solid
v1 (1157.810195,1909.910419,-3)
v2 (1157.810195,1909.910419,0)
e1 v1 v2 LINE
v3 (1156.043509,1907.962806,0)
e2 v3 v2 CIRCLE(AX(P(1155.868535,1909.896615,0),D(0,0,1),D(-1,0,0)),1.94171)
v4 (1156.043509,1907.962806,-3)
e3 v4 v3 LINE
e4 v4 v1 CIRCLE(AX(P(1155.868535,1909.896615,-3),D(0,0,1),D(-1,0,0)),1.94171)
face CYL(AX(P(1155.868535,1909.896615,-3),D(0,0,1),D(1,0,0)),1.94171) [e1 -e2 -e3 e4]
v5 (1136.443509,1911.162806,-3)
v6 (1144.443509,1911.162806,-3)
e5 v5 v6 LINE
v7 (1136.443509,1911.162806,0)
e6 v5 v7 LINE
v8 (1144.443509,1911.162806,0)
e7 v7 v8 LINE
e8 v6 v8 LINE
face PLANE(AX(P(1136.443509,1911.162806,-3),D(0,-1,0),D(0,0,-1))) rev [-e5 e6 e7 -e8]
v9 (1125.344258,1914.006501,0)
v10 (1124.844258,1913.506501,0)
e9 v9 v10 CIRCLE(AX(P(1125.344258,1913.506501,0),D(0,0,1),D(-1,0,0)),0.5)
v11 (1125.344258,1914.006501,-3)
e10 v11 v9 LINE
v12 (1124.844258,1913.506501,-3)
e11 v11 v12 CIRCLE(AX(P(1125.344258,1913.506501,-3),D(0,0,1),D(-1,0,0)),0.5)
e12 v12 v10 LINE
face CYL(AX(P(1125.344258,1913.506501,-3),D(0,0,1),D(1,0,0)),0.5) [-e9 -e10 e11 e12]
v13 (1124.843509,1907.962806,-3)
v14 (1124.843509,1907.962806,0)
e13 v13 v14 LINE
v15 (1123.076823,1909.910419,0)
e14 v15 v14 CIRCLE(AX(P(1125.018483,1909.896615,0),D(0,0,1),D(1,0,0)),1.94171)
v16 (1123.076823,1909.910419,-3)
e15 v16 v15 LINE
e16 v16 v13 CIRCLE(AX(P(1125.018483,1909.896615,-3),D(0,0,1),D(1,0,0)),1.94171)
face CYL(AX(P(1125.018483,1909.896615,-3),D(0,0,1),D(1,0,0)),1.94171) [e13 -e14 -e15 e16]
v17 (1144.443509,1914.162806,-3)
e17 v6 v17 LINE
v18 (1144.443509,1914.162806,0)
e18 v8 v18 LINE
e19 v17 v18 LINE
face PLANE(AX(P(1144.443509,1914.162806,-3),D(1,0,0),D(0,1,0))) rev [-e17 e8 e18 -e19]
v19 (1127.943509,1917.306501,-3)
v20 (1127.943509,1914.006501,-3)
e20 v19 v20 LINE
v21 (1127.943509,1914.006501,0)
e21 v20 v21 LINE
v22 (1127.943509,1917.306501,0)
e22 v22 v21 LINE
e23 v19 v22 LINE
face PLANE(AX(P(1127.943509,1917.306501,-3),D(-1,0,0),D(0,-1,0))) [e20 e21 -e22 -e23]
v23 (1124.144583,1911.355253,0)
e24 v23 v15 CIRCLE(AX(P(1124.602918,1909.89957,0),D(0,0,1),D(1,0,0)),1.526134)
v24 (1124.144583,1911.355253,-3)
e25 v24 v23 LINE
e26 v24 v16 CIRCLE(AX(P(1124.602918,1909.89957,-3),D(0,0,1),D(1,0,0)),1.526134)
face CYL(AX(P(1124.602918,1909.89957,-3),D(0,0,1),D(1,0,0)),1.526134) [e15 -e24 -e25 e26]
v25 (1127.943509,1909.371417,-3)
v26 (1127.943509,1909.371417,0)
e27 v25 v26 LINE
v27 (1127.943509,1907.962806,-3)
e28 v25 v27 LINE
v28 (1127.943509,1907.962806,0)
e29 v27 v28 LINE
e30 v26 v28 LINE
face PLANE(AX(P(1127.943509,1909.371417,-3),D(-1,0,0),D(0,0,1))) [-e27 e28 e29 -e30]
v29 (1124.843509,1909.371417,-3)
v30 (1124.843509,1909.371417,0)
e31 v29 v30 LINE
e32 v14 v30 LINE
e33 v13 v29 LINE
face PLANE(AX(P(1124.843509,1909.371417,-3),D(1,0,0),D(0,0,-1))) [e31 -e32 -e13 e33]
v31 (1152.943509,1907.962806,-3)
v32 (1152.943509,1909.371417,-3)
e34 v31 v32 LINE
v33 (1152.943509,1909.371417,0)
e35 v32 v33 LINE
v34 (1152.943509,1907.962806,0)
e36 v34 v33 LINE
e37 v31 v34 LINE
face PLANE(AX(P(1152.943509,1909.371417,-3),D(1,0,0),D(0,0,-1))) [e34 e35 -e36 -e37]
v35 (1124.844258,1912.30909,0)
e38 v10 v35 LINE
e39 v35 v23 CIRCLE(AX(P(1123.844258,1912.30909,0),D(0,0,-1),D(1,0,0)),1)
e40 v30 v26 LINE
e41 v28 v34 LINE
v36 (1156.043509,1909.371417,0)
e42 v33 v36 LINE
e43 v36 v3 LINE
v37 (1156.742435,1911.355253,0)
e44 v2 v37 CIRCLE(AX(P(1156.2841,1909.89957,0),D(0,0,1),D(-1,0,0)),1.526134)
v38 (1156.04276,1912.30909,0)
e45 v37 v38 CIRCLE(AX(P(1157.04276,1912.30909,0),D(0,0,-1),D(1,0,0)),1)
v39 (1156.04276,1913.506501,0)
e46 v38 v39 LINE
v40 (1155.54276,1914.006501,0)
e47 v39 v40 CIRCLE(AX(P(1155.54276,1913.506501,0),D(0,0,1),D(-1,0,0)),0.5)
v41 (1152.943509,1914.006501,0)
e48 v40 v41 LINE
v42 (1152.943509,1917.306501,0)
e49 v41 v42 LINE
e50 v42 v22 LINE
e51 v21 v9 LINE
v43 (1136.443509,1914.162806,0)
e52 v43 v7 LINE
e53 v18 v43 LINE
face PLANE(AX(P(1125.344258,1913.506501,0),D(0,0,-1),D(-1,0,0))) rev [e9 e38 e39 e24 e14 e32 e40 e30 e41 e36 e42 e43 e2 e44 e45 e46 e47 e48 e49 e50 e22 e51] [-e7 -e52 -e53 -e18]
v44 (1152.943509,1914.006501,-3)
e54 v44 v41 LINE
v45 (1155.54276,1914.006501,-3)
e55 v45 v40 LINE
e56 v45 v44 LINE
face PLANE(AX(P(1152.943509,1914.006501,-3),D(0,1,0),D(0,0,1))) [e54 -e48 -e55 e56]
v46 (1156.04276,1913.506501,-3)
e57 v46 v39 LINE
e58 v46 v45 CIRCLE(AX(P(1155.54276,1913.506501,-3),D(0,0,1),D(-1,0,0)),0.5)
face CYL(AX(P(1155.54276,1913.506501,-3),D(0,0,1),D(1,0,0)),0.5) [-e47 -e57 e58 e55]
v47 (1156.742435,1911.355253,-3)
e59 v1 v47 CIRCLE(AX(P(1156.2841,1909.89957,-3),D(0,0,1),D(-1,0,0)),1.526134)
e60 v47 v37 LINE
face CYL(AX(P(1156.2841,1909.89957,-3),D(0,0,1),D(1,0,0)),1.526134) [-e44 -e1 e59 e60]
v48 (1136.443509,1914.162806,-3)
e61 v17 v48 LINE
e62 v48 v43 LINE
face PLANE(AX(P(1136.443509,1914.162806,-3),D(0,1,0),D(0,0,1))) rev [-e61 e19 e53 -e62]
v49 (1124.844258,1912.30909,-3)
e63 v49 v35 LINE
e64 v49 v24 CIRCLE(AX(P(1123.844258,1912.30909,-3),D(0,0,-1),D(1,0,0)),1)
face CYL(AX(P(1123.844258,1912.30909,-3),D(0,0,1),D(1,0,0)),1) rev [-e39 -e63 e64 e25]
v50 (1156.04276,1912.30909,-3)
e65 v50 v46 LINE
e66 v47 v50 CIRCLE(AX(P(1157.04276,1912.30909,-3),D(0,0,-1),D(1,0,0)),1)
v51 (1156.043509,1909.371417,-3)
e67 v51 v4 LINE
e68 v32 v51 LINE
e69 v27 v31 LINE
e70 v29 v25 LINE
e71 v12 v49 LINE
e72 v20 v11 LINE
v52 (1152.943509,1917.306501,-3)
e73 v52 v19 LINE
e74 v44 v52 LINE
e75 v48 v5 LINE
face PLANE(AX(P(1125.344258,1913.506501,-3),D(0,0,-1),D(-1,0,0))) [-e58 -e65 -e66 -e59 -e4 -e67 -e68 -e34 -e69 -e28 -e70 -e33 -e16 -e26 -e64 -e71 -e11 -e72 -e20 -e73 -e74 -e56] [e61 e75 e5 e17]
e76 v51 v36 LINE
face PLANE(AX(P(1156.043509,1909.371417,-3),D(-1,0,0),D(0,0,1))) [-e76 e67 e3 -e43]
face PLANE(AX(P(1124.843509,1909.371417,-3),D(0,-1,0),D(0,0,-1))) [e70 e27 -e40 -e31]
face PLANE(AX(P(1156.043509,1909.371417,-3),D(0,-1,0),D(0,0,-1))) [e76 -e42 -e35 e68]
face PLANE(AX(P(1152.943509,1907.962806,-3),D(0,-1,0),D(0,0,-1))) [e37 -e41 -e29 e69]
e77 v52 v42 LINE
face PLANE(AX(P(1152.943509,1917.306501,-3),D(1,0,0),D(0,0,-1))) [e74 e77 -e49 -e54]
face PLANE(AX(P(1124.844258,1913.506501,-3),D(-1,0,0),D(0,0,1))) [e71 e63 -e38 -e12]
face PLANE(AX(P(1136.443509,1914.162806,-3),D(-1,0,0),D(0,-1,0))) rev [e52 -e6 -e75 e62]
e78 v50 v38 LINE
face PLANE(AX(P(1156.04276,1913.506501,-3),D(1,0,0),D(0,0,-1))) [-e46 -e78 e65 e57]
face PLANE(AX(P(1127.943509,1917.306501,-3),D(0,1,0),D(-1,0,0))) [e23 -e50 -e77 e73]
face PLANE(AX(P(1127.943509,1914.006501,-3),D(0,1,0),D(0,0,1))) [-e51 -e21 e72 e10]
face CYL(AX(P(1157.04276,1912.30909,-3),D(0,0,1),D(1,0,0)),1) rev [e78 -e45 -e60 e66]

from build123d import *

# Parameters (mm, degrees)
ESQUISSE1_W               = 8
ESQUISSE1_H               = 3
T_LE_DE_BASE_PLI_E1_DEPTH = 3


# Sheet-metal steps are written as plain solids
with BuildPart() as part:
    # Esquisse1 → Tôle de base pliée1 (new body)
    with BuildSketch(Plane.XY):
        with BuildLine():
            Line((1127.943508916, 1917.30650062), (1152.943508916, 1917.30650062))
            Line((1152.943508916, 1917.30650062), (1152.943508916, 1914.00650062))
            Line((1152.943508916, 1914.00650062), (1155.54275991, 1914.00650062))
            ThreePointArc((1155.54275991, 1914.00650062), (1155.896313301, 1913.860054011), (1156.04275991, 1913.50650062))
            Line((1156.04275991, 1913.50650062), (1156.04275991, 1912.309090129))
            ThreePointArc((1156.04275991, 1912.309090129), (1156.236433485, 1911.717619339), (1156.742435301, 1911.355253073))
            ThreePointArc((1156.742435301, 1911.355253073), (1157.511445693, 1910.806601852), (1157.810195296, 1909.910418936))
            ThreePointArc((1157.810195296, 1909.910418936), (1157.306705477, 1908.592046054), (1156.043508916, 1907.962805635))
            Line((1156.043508916, 1907.962805635), (1156.043508916, 1909.371416958))
            Line((1156.043508916, 1909.371416958), (1152.943508916, 1909.371416958))
            Line((1152.943508916, 1909.371416958), (1152.943508916, 1907.962805635))
            Line((1152.943508916, 1907.962805635), (1127.943508916, 1907.962805635))
            Line((1127.943508916, 1907.962805635), (1127.943508916, 1909.371416958))
            Line((1127.943508916, 1909.371416958), (1124.843508916, 1909.371416958))
            Line((1124.843508916, 1909.371416958), (1124.843508916, 1907.962805635))
            ThreePointArc((1124.843508916, 1907.962805635), (1123.580312356, 1908.592046054), (1123.076822537, 1909.910418936))
            ThreePointArc((1123.076822537, 1909.910418936), (1123.37557214, 1910.806601852), (1124.144582531, 1911.355253073))
            ThreePointArc((1124.144582531, 1911.355253073), (1124.650584348, 1911.717619339), (1124.844257922, 1912.309090129))
            Line((1124.844257922, 1912.309090129), (1124.844257922, 1913.50650062))
            ThreePointArc((1124.844257922, 1913.50650062), (1124.990704532, 1913.860054011), (1125.344257922, 1914.00650062))
            Line((1125.344257922, 1914.00650062), (1127.943508916, 1914.00650062))
            Line((1127.943508916, 1914.00650062), (1127.943508916, 1917.30650062))
        make_face()
        with Locations((1140.443508916, 1912.662805635)):
            Rectangle(ESQUISSE1_W, ESQUISSE1_H, mode=Mode.SUBTRACT)
    extrude(amount=-T_LE_DE_BASE_PLI_E1_DEPTH)


solid = part.part
